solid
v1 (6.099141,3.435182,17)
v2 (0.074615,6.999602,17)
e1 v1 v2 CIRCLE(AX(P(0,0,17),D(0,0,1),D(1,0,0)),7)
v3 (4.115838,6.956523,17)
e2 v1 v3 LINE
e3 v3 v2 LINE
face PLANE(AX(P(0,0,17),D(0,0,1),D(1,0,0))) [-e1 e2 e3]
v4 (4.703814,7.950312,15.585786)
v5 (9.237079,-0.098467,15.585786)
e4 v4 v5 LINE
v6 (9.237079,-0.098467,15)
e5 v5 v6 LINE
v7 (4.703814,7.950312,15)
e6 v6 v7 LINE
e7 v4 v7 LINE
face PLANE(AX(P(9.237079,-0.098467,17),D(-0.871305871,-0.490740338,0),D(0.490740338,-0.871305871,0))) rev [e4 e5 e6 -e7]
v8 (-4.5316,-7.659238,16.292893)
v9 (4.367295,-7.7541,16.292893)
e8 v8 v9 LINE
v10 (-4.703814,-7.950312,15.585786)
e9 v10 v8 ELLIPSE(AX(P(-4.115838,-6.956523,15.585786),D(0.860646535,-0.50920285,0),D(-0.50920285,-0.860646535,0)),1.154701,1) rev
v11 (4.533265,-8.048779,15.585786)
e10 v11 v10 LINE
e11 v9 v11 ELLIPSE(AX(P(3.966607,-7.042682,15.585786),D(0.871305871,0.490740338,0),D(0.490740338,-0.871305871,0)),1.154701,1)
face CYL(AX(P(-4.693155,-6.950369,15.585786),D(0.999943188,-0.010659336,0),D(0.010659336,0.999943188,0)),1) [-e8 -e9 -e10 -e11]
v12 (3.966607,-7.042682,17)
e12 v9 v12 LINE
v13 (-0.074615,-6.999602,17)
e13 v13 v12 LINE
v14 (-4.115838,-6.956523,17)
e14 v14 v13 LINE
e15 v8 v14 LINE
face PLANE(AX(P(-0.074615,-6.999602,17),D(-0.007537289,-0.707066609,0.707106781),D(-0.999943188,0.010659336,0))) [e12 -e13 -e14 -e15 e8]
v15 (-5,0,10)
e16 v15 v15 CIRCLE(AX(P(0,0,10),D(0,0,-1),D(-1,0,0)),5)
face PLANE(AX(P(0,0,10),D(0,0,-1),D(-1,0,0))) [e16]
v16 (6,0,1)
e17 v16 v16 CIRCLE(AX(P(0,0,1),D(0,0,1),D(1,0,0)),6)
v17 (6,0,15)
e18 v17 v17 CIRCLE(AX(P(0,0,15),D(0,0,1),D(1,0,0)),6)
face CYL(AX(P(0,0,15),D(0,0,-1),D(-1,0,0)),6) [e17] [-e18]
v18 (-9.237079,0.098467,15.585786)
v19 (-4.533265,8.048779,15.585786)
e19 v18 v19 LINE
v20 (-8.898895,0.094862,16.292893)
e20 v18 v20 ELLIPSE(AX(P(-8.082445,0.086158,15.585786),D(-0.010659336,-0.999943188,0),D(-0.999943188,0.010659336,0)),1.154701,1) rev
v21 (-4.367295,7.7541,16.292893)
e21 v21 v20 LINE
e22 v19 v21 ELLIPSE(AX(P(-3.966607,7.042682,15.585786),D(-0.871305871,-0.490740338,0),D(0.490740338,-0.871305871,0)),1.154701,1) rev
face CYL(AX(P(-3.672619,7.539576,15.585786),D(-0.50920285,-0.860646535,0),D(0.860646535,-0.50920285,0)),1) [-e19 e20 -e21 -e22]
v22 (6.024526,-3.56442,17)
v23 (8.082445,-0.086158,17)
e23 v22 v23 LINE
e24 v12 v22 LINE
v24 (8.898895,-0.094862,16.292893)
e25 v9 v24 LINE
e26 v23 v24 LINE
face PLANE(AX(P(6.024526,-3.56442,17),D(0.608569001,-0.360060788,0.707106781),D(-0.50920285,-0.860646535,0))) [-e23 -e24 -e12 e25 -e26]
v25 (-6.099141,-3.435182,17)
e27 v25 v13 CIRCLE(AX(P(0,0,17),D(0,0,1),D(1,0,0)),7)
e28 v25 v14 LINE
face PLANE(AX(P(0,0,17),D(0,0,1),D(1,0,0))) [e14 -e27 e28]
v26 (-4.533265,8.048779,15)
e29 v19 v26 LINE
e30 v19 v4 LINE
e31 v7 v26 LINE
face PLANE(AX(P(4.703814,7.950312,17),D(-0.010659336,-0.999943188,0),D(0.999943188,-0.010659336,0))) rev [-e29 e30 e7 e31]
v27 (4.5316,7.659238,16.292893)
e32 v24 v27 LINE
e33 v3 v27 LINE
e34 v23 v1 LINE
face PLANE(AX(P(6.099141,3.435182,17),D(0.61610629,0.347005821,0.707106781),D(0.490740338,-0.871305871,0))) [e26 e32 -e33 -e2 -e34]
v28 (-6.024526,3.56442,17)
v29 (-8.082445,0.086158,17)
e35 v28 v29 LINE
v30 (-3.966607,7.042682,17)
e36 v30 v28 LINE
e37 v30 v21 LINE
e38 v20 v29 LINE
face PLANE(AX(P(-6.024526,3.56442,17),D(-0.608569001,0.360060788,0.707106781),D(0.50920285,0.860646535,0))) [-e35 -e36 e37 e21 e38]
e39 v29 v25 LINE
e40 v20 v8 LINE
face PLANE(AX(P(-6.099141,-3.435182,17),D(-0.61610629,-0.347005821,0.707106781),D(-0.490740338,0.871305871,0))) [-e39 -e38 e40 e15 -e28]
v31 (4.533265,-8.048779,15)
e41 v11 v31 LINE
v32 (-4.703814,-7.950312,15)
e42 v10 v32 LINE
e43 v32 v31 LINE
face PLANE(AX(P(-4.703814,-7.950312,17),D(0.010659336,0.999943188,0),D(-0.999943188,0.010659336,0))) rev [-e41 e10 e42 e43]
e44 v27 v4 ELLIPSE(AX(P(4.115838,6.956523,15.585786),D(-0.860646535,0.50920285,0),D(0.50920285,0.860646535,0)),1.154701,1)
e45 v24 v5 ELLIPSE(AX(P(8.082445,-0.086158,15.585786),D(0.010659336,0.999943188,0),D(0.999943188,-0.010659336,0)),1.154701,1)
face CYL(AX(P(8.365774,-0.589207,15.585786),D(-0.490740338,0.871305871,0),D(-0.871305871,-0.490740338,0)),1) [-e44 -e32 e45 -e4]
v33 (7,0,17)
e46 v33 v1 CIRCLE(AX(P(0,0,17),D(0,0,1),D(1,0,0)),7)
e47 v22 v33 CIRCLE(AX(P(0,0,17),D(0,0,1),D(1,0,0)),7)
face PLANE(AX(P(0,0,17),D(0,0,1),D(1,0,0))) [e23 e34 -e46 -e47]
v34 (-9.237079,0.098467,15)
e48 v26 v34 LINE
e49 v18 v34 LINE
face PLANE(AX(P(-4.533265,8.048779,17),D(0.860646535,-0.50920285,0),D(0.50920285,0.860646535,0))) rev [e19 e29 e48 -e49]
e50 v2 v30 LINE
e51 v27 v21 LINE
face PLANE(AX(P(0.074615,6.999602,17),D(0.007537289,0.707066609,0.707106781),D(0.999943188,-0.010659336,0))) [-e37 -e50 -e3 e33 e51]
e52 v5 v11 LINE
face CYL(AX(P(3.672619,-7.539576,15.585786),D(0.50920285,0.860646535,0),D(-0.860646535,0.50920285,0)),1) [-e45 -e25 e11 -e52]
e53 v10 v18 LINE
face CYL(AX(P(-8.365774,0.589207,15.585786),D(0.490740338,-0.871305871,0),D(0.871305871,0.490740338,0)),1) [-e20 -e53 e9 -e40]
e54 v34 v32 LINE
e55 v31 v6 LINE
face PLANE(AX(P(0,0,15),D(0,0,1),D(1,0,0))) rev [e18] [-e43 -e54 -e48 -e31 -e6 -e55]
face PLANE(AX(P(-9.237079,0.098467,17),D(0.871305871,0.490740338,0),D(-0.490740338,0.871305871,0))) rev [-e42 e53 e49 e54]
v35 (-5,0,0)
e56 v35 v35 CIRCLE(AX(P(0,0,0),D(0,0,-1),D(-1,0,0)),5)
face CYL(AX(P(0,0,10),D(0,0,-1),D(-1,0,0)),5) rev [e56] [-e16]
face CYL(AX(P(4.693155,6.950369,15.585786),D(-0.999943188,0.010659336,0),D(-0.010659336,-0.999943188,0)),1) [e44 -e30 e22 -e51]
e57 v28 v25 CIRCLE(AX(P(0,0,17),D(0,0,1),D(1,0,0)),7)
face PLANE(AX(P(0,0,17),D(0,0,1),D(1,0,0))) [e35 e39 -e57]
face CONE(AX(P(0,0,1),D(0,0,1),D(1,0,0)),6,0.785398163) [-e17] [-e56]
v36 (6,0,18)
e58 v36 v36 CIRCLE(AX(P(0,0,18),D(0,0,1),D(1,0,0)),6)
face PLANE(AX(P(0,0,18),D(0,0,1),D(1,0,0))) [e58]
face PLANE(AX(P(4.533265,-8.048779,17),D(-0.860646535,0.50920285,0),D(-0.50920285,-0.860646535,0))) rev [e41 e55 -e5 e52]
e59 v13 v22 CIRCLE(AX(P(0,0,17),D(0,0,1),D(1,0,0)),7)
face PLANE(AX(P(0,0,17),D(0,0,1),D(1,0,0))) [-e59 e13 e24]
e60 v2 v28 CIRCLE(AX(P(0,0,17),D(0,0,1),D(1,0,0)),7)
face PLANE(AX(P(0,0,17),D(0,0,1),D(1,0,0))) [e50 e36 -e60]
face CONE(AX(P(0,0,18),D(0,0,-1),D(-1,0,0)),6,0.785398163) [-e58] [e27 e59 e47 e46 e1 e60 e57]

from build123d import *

# Parameters (mm, degrees)
SKETCH_1_R          = 6
EXTRUDE_1_DEPTH     = 15
EXTRUDE_2_DEPTH     = 2
SKETCH_3_R          = 7
EXTRUDE_3_DEPTH     = 1
CHAMFER_1_SIZE      = 1
FILLET_1_R          = 1
SKETCH_4_R          = 5
CUT_EXTRUDE_1_DEPTH = 10


with BuildPart() as part:
    # 草图1 → 凸台-拉伸1 (new body)
    with BuildSketch(Plane.XY):
        Circle(SKETCH_1_R)
    extrude(amount=EXTRUDE_1_DEPTH)

    # 草图2 → 凸台-拉伸2 (add)
    with BuildSketch(Plane.XY.offset(15)):
        Polygon((4.70381444, 7.950312136), (-4.533265058, 8.048778867), (-9.237079497, 0.098466732), (-4.70381444, -7.950312136), (4.533265058, -8.048778867), (9.237079497, -0.098466732), align=None)
    extrude(amount=EXTRUDE_2_DEPTH)

    # 草图3 → 凸台-拉伸3 (add)
    with BuildSketch(Plane.XY.offset(17)):
        Circle(SKETCH_3_R)
    extrude(amount=EXTRUDE_3_DEPTH)

    # 倒角1
    chamfer_1_edges = [part.edges().sort_by_distance(p)[0] for p in [
        (-6, 0, 0),
        (-7, 0, 18),
        (6.970446968, 3.925922702, 17),
        (0.085274691, 7.999545501, 17),
        (-6.885172277, 4.073622799, 17),
        (-6.970446968, -3.925922702, 17),
        (-0.085274691, -7.999545501, 17),
        (6.885172277, -4.073622799, 17),
    ]]
    chamfer(chamfer_1_edges, length=CHAMFER_1_SIZE - 0.0001)  # a hair under: the kernel refuses the full size

    # 圆角1
    fillet_1_edges = [part.edges().sort_by_distance(p)[0] for p in [
        (-6.885172277, 4.073622799, 16.0001),
        (0.085274691, 7.999545501, 16.0001),
        (6.970446968, 3.925922702, 16.0001),
        (6.885172277, -4.073622799, 16.0001),
        (-6.970446968, -3.925922702, 16.0001),
        (-0.085274691, -7.999545501, 16.0001),
    ]]
    fillet(fillet_1_edges, radius=FILLET_1_R)

    # 草图4 → 切除-拉伸1 (cut)
    with BuildSketch(Plane(origin=(0, 0, 0), x_dir=(-1, 0, 0), z_dir=(0, 0, -1))):
        Circle(SKETCH_4_R)
    extrude(amount=-CUT_EXTRUDE_1_DEPTH, mode=Mode.SUBTRACT)


solid = part.part
